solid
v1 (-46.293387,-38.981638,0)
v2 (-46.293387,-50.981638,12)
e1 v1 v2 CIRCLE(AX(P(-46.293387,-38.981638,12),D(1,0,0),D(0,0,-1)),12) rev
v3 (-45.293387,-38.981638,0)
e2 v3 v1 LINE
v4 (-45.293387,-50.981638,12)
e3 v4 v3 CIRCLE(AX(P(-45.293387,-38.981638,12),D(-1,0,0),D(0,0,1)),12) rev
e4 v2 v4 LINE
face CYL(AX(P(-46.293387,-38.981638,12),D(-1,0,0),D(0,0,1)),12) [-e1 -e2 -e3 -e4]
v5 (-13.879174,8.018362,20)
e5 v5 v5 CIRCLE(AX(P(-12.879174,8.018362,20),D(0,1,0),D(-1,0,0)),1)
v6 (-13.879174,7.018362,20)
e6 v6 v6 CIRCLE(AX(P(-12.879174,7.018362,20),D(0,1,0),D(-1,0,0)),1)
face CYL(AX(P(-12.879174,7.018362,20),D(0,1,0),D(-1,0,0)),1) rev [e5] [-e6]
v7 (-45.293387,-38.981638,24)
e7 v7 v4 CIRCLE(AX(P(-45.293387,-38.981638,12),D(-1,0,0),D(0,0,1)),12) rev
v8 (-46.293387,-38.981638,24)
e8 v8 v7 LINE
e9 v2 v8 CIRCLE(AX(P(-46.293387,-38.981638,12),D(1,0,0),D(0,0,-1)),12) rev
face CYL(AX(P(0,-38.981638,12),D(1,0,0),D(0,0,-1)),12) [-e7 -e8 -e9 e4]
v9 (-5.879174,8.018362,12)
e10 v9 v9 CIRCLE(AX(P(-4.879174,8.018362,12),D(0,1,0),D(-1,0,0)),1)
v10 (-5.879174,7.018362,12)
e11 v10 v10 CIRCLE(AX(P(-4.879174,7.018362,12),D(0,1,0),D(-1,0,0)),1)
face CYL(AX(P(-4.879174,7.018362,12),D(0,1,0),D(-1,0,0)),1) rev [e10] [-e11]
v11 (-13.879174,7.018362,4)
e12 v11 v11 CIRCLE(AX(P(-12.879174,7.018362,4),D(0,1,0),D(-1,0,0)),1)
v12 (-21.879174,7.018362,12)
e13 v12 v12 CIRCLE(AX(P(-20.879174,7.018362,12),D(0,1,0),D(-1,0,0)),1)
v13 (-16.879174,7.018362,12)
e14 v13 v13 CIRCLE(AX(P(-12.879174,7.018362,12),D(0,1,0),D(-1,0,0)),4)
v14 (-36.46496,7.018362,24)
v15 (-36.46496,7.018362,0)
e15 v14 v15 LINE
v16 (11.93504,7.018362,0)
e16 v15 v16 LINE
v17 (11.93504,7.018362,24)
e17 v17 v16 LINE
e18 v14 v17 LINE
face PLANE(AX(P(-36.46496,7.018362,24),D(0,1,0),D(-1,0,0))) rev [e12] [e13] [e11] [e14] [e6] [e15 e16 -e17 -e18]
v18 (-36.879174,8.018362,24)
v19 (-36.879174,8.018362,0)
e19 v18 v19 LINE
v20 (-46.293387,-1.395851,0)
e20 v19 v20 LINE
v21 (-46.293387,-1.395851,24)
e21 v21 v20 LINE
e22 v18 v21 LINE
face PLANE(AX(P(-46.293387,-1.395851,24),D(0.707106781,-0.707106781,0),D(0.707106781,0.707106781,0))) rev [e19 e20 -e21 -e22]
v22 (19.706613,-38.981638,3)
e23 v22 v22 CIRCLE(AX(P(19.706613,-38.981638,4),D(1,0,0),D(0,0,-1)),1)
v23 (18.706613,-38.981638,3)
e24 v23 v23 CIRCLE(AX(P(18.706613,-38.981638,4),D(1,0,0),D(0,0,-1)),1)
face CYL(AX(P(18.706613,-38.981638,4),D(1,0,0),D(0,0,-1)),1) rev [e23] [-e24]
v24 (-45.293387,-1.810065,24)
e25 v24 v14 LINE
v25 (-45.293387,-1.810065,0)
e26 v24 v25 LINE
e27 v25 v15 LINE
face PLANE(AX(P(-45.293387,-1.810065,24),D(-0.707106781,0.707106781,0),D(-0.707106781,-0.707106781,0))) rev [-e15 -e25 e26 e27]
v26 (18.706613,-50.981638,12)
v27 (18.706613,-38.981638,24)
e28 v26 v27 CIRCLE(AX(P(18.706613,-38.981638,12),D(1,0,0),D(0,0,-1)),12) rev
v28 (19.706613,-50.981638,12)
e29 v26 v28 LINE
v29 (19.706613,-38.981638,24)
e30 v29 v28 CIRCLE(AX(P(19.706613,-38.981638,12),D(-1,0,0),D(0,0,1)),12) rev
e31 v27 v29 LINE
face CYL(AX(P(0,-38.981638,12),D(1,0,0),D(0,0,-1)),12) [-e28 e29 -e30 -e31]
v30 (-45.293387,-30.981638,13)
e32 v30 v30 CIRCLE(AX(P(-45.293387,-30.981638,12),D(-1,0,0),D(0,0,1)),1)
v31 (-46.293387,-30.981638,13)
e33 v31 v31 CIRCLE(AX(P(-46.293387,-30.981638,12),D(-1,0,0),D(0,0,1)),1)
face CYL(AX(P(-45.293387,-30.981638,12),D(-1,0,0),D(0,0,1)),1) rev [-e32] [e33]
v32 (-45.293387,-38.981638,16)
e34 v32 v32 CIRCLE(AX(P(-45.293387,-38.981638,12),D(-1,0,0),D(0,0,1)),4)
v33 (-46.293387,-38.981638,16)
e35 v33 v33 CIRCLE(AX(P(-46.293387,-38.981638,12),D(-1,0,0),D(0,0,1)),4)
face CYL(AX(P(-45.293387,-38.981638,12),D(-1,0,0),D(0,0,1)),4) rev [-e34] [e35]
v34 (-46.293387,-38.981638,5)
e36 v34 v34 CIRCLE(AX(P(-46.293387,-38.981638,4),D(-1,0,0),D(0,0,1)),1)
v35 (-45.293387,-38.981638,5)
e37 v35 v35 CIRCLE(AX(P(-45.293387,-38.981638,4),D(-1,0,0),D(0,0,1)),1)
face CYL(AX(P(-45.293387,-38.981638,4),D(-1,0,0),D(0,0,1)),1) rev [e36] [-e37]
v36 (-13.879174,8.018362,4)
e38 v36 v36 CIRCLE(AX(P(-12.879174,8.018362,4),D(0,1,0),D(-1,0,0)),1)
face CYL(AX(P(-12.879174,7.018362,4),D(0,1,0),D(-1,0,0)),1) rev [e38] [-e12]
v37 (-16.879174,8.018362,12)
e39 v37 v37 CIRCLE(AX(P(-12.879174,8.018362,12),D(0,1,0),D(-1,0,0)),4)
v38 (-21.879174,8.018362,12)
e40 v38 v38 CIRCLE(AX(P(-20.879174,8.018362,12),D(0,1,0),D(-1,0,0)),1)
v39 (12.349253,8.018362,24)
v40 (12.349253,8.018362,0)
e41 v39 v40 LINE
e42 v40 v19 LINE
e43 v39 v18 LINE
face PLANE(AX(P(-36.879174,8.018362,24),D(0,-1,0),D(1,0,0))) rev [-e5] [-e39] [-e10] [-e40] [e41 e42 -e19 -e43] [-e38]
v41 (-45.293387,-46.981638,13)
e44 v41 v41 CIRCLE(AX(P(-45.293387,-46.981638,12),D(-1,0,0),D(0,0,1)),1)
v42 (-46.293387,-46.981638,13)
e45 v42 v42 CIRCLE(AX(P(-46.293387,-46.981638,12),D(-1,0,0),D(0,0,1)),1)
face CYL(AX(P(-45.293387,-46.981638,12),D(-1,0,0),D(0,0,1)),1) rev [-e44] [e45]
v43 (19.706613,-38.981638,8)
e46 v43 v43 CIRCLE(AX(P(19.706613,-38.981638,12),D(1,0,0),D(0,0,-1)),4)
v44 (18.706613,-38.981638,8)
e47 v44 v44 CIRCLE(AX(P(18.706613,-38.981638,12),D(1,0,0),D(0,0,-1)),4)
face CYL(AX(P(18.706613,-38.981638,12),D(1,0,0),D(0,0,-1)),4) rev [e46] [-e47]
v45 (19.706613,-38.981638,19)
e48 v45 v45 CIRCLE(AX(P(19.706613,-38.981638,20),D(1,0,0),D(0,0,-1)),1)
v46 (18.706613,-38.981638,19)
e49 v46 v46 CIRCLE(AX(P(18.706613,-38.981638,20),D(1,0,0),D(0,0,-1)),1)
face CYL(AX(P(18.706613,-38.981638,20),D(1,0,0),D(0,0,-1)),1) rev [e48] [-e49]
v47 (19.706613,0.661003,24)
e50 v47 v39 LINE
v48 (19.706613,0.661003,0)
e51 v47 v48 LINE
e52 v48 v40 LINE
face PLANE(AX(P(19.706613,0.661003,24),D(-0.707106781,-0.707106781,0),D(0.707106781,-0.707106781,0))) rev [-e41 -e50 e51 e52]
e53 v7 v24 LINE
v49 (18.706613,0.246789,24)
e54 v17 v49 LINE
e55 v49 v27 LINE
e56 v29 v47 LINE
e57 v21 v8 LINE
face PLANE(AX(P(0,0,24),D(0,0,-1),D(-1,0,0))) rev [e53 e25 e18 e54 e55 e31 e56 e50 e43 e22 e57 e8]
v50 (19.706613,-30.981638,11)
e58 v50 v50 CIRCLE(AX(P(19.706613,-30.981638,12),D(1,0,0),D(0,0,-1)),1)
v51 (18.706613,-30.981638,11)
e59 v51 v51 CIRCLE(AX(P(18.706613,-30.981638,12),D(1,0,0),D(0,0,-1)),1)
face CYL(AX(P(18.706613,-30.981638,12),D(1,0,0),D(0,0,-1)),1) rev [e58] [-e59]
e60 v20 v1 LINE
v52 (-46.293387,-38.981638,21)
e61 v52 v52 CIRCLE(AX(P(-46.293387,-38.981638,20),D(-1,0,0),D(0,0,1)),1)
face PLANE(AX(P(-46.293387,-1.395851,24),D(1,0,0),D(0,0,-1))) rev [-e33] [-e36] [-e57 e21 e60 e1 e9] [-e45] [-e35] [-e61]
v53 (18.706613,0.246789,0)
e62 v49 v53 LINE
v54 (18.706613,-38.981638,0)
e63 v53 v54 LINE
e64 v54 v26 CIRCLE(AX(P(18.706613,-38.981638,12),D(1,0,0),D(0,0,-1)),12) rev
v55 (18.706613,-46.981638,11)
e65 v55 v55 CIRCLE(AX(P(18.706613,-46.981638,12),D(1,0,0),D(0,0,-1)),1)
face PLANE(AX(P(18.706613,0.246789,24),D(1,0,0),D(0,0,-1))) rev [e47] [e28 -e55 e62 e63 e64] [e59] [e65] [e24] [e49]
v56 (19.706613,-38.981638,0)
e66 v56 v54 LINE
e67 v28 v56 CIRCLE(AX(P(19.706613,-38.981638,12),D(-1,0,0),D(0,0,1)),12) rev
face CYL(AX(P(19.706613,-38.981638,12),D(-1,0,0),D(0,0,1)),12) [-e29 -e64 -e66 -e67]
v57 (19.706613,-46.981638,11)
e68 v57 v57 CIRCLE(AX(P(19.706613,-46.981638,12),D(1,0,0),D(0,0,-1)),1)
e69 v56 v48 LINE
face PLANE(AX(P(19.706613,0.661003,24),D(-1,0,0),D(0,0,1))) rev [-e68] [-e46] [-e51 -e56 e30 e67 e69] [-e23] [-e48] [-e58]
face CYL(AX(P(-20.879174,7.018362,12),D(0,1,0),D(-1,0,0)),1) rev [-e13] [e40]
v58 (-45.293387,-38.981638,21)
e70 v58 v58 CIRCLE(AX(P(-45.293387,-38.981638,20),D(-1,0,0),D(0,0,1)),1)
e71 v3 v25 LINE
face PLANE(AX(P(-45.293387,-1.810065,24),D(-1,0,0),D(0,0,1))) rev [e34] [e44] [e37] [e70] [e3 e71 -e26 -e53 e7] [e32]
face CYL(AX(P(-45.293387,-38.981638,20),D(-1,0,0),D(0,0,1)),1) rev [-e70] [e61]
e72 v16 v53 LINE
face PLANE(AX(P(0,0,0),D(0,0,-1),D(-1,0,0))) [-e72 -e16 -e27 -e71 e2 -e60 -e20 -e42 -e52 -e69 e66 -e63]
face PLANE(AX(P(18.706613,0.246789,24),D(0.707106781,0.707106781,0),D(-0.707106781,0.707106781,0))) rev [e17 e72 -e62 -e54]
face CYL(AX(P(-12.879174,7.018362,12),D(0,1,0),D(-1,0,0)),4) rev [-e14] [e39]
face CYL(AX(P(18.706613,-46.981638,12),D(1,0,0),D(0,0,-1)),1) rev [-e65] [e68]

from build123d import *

# Parameters (mm, degrees)
BOSS_EXTRUDE1_DEPTH = 24
SKETCH5_R           = 1
SKETCH5_R_2         = 4
CUT_EXTRUDE3_DEPTH  = 1
CUT_EXTRUDE4_START  = -1
SKETCH6_R           = 4
SKETCH6_R_2         = 1
CUT_EXTRUDE4_DEPTH  = 1
SKETCH7_R           = 4
SKETCH7_R_2         = 1
CUT_EXTRUDE5_DEPTH  = 1
FILLET1_R           = 12


with BuildPart() as part:
    # Sketch1 → Boss-Extrude1 (new body)
    with BuildSketch(Plane.XY):
        Polygon((18.706612688, 0.24678935), (18.706612688, -50.981637775), (19.706612688, -50.981637775), (19.706612688, 0.661002912), (12.349253376, 8.018362225), (-36.879173749, 8.018362225), (-46.293387312, -1.395851338), (-46.293387312, -50.981637775), (-45.293387312, -50.981637775), (-45.293387312, -1.8100649), (-36.464960187, 7.018362225), (11.935039813, 7.018362225), align=None)
    extrude(amount=BOSS_EXTRUDE1_DEPTH)

    # Sketch5 → Cut-Extrude3 (cut)
    with BuildSketch(Plane.ZY.offset(46.293387312)):
        with Locations((20, -38.981637775)):
            Circle(SKETCH5_R)
        with Locations((12, -38.981637775)):
            Circle(SKETCH5_R_2)
        with Locations((12, -46.981637775)):
            Circle(SKETCH5_R)
        with Locations((4, -38.981637775)):
            Circle(SKETCH5_R)
        with Locations((12, -30.981637775)):
            Circle(SKETCH5_R)
    extrude(amount=-CUT_EXTRUDE3_DEPTH, mode=Mode.SUBTRACT)

    # Sketch6 → Cut-Extrude4 (cut)
    with BuildSketch(Plane(origin=(19.706612688, 0, 0), x_dir=(0, 0, -1), z_dir=(1, 0, 0)).offset(CUT_EXTRUDE4_START)):
        with Locations(Location((-12, -38.981637775, 0), (0, 0, 180))):
            Circle(SKETCH6_R)
        with Locations(Location((-4, -38.981637775, 0), (0, 0, 180))):
            Circle(SKETCH6_R_2)
        with Locations(Location((-12, -46.981637775, 0), (0, 0, 180))):
            Circle(SKETCH6_R_2)
        with Locations(Location((-20, -38.981637775, 0), (0, 0, 180))):
            Circle(SKETCH6_R_2)
        with Locations(Location((-12, -30.981637775, 0), (0, 0, 180))):
            Circle(SKETCH6_R_2)
    extrude(amount=CUT_EXTRUDE4_DEPTH, mode=Mode.SUBTRACT)

    # Sketch7 → Cut-Extrude5 (cut)
    with BuildSketch(Plane(origin=(0, 8.018362225, 0), x_dir=(1, 0, 0), z_dir=(0, 1, 0))):
        with Locations(Location((-12.879173749, -12, 0), (0, 0, 180))):
            Circle(SKETCH7_R)
        with Locations(Location((-12.879173749, -20, 0), (0, 0, 180))):
            Circle(SKETCH7_R_2)
        with Locations(Location((-20.879173749, -12, 0), (0, 0, 180))):
            Circle(SKETCH7_R_2)
        with Locations(Location((-12.879173749, -4, 0), (0, 0, 180))):
            Circle(SKETCH7_R_2)
        with Locations(Location((-4.879173749, -12, 0), (0, 0, 180))):
            Circle(SKETCH7_R_2)
    extrude(amount=-CUT_EXTRUDE5_DEPTH, mode=Mode.SUBTRACT)

    # Fillet1
    fillet1_edges = [part.edges().sort_by_distance(p)[0] for p in [
        (19.206612688, -50.981637775, 24),
        (19.206612688, -50.981637775, 0),
        (-45.793387312, -50.981637775, 24),
        (-45.793387312, -50.981637775, 0),
    ]]
    fillet(fillet1_edges, radius=FILLET1_R - 0.0001)  # a hair under: the kernel refuses the full size


solid = part.part
